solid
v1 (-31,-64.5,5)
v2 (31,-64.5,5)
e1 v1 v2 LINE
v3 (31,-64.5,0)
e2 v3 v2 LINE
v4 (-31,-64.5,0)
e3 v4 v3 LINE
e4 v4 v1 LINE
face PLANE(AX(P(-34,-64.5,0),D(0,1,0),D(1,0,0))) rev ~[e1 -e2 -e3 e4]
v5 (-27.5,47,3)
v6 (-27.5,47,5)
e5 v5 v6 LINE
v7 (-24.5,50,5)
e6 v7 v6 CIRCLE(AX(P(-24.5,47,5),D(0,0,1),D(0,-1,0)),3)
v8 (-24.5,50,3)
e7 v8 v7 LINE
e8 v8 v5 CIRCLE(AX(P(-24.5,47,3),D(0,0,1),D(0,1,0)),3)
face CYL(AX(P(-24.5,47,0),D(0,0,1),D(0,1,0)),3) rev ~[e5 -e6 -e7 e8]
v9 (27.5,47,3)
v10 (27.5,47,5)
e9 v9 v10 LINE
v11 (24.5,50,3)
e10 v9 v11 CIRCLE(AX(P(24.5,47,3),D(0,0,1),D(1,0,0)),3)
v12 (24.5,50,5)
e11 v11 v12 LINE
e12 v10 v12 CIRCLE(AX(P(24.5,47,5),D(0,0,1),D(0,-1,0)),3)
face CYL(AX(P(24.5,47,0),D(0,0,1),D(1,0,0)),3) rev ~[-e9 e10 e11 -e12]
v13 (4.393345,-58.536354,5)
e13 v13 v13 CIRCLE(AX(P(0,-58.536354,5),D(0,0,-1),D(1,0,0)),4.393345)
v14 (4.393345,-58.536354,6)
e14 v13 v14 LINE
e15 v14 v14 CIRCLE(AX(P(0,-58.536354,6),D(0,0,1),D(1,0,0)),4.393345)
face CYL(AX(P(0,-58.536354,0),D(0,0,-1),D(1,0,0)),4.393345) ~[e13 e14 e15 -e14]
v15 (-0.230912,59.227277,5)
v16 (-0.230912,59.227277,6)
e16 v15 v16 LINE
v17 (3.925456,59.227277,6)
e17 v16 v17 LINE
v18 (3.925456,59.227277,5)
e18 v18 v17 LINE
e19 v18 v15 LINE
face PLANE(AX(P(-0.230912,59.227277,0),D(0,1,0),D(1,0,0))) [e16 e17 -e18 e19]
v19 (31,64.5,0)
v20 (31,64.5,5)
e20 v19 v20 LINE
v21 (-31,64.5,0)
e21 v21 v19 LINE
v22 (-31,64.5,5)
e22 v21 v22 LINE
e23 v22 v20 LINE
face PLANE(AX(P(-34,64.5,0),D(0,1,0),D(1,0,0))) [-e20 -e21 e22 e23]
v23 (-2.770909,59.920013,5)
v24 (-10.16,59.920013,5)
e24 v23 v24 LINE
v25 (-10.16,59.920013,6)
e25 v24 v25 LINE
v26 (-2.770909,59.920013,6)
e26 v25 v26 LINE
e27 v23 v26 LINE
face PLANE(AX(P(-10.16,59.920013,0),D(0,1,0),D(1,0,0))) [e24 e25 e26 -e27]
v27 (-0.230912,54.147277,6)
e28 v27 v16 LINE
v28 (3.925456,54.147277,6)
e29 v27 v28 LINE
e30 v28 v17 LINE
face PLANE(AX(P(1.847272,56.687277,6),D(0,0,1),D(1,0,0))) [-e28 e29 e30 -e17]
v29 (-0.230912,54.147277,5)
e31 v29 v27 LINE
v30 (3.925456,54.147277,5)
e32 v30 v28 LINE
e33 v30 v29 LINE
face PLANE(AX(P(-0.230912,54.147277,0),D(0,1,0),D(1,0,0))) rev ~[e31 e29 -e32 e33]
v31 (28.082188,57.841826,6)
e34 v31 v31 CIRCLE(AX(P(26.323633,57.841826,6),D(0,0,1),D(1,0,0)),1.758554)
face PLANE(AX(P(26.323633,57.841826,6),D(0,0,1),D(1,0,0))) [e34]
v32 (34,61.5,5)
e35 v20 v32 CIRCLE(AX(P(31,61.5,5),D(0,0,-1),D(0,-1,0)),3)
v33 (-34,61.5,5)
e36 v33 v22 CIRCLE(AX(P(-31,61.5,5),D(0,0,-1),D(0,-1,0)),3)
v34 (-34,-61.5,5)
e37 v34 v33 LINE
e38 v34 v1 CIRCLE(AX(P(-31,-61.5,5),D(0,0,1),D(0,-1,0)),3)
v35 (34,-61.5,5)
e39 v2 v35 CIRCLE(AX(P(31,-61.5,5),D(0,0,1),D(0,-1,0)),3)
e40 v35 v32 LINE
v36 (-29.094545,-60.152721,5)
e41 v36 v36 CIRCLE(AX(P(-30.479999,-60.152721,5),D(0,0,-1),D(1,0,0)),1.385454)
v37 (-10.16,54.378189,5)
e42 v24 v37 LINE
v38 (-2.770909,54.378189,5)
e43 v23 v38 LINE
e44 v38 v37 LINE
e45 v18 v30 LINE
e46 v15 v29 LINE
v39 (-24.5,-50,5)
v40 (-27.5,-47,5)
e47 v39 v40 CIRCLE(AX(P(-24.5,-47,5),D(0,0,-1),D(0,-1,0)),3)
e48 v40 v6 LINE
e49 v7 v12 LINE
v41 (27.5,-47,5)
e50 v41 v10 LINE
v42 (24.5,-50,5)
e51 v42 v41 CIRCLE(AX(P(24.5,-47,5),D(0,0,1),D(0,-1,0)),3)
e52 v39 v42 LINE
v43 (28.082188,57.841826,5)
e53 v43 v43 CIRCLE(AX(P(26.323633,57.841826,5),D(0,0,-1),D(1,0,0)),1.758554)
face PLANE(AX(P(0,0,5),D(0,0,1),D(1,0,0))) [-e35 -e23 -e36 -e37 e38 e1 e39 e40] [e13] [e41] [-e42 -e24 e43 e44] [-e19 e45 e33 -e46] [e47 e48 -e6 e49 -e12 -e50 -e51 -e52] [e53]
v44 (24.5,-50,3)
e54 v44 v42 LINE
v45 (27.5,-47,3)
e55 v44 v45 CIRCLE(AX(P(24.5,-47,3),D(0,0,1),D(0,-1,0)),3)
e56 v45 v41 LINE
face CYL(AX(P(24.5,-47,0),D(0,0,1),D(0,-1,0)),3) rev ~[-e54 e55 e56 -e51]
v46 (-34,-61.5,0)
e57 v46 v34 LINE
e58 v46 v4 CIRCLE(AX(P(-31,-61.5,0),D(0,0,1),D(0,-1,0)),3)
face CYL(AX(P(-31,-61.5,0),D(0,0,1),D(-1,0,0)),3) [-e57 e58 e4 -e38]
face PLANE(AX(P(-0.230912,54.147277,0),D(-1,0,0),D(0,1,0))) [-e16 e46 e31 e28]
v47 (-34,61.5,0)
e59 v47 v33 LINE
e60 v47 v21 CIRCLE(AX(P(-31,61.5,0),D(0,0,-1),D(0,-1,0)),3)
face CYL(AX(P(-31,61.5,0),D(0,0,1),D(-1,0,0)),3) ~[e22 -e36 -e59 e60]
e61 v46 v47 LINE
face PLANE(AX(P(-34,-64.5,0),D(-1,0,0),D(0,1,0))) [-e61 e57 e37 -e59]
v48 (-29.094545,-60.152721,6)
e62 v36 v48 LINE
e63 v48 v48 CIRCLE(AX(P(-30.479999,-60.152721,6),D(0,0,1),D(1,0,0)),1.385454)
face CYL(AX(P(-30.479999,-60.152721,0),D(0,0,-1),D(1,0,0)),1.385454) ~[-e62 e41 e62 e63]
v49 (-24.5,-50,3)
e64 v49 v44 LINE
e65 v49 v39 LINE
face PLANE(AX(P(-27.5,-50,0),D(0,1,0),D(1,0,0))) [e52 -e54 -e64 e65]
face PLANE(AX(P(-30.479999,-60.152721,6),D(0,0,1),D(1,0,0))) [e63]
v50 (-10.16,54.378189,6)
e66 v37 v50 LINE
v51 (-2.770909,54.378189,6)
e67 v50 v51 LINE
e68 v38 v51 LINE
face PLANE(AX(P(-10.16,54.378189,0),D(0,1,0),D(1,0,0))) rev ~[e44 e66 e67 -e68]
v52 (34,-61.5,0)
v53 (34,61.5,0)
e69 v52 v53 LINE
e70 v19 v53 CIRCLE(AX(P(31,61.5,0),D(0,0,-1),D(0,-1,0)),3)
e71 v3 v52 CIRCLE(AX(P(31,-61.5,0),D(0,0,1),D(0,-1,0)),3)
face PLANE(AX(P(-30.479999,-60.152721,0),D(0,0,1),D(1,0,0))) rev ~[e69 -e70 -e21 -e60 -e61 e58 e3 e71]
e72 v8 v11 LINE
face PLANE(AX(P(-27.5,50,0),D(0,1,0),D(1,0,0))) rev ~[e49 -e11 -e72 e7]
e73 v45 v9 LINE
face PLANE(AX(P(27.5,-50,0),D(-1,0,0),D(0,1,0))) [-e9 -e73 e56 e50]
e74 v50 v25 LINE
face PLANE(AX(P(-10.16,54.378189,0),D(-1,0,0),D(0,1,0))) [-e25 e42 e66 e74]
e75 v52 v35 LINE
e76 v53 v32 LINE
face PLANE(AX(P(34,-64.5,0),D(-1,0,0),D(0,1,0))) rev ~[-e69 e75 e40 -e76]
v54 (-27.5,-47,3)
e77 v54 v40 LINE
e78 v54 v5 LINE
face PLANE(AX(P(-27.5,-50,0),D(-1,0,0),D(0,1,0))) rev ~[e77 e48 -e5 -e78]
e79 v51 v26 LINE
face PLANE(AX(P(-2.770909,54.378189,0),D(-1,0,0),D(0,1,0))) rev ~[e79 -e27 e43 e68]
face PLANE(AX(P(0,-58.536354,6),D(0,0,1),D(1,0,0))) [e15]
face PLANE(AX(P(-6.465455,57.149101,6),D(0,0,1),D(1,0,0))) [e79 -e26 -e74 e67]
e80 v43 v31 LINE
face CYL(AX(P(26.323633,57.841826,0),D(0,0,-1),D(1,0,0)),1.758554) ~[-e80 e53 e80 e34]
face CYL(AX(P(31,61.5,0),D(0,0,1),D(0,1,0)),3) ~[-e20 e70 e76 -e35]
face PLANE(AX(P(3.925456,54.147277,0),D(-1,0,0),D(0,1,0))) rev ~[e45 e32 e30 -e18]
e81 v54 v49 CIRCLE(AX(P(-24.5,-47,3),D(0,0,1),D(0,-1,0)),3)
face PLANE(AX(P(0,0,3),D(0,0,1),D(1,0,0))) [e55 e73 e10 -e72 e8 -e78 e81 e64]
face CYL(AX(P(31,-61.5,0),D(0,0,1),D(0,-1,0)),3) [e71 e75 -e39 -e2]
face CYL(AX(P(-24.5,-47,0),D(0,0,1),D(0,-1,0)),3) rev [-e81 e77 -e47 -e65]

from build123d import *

# Parameters (mm, degrees)
F1_W      = 68
F1_H      = 129
F1_W_2    = 55
F1_H_2    = 100
F2_DEPTH  = 5
F3_R      = 3
F4_R      = 3
F5_W      = 55
F5_H      = 100
F6_DEPTH  = 3
F0_R      = 4.3933448382
F7_DEPTH  = 6
F8_W      = 4.1563683189
F8_H      = 5.0799995661
F9_DEPTH  = 6
F10_W     = 7.3890909553
F10_H     = 5.5418238044
F11_DEPTH = 6
F12_R     = 1.7585544961
F13_DEPTH = 6
F24_R     = 1.3854540884
F25_DEPTH = 6


# Not quite as in the source:
# - the program builds the solid bodies; features that only make, move or delete a surface that nothing else refers to are left out


with BuildPart() as f2:
    # F1 (on Top) → F2 (new body)
    with BuildSketch(Plane.XY):
        Rectangle(F1_W, F1_H)
        Rectangle(F1_W_2, F1_H_2, mode=Mode.SUBTRACT)
    extrude(amount=F2_DEPTH)

    # F3
    f3_edges = [f2.edges().sort_by_distance(p)[0] for p in [
        (-34, 64.5, 2.5),
        (34, 64.5, 2.5),
        (34, -64.5, 2.5),
        (-34, -64.5, 2.5),
    ]]
    fillet(f3_edges, radius=F3_R)

    # F4
    f4_edges = [f2.edges().sort_by_distance(p)[0] for p in [
        (-27.5, 50, 2.5),
        (27.5, 50, 2.5),
        (-27.5, -50, 2.5),
        (27.5, -50, 2.5),
    ]]
    fillet(f4_edges, radius=F4_R)

    # F5 (on Top) → F6 (join)
    with BuildSketch(Plane.XY):
        Rectangle(F5_W, F5_H)
    extrude(amount=F6_DEPTH)

    # F0 (on Top) → F7 (join)
    with BuildSketch(Plane.XY):
        with Locations((0, -58.5363544524)):
            Circle(F0_R)
    extrude(amount=F7_DEPTH)

    # F8 (on Top) → F9 (join)
    with BuildSketch(Plane.XY):
        with Locations((1.8472720403, 56.6872768104)):
            Rectangle(F8_W, F8_H)
    extrude(amount=F9_DEPTH)

    # F10 (on Top) → F11 (join)
    with BuildSketch(Plane.XY):
        with Locations((-6.4654545859, 57.1491010487)):
            Rectangle(F10_W, F10_H)
    extrude(amount=F11_DEPTH)

    # F12 (on Top) → F13 (join)
    with BuildSketch(Plane.XY):
        with Locations((26.3236332685, 57.8418262303)):
            Circle(F12_R)
    extrude(amount=F13_DEPTH)

    # F24 (on Top) → F25 (join)
    with BuildSketch(Plane.XY):
        with Locations((-30.4799992591, -60.15272066)):
            Circle(F24_R)
    extrude(amount=F25_DEPTH)


solid = f2.part
